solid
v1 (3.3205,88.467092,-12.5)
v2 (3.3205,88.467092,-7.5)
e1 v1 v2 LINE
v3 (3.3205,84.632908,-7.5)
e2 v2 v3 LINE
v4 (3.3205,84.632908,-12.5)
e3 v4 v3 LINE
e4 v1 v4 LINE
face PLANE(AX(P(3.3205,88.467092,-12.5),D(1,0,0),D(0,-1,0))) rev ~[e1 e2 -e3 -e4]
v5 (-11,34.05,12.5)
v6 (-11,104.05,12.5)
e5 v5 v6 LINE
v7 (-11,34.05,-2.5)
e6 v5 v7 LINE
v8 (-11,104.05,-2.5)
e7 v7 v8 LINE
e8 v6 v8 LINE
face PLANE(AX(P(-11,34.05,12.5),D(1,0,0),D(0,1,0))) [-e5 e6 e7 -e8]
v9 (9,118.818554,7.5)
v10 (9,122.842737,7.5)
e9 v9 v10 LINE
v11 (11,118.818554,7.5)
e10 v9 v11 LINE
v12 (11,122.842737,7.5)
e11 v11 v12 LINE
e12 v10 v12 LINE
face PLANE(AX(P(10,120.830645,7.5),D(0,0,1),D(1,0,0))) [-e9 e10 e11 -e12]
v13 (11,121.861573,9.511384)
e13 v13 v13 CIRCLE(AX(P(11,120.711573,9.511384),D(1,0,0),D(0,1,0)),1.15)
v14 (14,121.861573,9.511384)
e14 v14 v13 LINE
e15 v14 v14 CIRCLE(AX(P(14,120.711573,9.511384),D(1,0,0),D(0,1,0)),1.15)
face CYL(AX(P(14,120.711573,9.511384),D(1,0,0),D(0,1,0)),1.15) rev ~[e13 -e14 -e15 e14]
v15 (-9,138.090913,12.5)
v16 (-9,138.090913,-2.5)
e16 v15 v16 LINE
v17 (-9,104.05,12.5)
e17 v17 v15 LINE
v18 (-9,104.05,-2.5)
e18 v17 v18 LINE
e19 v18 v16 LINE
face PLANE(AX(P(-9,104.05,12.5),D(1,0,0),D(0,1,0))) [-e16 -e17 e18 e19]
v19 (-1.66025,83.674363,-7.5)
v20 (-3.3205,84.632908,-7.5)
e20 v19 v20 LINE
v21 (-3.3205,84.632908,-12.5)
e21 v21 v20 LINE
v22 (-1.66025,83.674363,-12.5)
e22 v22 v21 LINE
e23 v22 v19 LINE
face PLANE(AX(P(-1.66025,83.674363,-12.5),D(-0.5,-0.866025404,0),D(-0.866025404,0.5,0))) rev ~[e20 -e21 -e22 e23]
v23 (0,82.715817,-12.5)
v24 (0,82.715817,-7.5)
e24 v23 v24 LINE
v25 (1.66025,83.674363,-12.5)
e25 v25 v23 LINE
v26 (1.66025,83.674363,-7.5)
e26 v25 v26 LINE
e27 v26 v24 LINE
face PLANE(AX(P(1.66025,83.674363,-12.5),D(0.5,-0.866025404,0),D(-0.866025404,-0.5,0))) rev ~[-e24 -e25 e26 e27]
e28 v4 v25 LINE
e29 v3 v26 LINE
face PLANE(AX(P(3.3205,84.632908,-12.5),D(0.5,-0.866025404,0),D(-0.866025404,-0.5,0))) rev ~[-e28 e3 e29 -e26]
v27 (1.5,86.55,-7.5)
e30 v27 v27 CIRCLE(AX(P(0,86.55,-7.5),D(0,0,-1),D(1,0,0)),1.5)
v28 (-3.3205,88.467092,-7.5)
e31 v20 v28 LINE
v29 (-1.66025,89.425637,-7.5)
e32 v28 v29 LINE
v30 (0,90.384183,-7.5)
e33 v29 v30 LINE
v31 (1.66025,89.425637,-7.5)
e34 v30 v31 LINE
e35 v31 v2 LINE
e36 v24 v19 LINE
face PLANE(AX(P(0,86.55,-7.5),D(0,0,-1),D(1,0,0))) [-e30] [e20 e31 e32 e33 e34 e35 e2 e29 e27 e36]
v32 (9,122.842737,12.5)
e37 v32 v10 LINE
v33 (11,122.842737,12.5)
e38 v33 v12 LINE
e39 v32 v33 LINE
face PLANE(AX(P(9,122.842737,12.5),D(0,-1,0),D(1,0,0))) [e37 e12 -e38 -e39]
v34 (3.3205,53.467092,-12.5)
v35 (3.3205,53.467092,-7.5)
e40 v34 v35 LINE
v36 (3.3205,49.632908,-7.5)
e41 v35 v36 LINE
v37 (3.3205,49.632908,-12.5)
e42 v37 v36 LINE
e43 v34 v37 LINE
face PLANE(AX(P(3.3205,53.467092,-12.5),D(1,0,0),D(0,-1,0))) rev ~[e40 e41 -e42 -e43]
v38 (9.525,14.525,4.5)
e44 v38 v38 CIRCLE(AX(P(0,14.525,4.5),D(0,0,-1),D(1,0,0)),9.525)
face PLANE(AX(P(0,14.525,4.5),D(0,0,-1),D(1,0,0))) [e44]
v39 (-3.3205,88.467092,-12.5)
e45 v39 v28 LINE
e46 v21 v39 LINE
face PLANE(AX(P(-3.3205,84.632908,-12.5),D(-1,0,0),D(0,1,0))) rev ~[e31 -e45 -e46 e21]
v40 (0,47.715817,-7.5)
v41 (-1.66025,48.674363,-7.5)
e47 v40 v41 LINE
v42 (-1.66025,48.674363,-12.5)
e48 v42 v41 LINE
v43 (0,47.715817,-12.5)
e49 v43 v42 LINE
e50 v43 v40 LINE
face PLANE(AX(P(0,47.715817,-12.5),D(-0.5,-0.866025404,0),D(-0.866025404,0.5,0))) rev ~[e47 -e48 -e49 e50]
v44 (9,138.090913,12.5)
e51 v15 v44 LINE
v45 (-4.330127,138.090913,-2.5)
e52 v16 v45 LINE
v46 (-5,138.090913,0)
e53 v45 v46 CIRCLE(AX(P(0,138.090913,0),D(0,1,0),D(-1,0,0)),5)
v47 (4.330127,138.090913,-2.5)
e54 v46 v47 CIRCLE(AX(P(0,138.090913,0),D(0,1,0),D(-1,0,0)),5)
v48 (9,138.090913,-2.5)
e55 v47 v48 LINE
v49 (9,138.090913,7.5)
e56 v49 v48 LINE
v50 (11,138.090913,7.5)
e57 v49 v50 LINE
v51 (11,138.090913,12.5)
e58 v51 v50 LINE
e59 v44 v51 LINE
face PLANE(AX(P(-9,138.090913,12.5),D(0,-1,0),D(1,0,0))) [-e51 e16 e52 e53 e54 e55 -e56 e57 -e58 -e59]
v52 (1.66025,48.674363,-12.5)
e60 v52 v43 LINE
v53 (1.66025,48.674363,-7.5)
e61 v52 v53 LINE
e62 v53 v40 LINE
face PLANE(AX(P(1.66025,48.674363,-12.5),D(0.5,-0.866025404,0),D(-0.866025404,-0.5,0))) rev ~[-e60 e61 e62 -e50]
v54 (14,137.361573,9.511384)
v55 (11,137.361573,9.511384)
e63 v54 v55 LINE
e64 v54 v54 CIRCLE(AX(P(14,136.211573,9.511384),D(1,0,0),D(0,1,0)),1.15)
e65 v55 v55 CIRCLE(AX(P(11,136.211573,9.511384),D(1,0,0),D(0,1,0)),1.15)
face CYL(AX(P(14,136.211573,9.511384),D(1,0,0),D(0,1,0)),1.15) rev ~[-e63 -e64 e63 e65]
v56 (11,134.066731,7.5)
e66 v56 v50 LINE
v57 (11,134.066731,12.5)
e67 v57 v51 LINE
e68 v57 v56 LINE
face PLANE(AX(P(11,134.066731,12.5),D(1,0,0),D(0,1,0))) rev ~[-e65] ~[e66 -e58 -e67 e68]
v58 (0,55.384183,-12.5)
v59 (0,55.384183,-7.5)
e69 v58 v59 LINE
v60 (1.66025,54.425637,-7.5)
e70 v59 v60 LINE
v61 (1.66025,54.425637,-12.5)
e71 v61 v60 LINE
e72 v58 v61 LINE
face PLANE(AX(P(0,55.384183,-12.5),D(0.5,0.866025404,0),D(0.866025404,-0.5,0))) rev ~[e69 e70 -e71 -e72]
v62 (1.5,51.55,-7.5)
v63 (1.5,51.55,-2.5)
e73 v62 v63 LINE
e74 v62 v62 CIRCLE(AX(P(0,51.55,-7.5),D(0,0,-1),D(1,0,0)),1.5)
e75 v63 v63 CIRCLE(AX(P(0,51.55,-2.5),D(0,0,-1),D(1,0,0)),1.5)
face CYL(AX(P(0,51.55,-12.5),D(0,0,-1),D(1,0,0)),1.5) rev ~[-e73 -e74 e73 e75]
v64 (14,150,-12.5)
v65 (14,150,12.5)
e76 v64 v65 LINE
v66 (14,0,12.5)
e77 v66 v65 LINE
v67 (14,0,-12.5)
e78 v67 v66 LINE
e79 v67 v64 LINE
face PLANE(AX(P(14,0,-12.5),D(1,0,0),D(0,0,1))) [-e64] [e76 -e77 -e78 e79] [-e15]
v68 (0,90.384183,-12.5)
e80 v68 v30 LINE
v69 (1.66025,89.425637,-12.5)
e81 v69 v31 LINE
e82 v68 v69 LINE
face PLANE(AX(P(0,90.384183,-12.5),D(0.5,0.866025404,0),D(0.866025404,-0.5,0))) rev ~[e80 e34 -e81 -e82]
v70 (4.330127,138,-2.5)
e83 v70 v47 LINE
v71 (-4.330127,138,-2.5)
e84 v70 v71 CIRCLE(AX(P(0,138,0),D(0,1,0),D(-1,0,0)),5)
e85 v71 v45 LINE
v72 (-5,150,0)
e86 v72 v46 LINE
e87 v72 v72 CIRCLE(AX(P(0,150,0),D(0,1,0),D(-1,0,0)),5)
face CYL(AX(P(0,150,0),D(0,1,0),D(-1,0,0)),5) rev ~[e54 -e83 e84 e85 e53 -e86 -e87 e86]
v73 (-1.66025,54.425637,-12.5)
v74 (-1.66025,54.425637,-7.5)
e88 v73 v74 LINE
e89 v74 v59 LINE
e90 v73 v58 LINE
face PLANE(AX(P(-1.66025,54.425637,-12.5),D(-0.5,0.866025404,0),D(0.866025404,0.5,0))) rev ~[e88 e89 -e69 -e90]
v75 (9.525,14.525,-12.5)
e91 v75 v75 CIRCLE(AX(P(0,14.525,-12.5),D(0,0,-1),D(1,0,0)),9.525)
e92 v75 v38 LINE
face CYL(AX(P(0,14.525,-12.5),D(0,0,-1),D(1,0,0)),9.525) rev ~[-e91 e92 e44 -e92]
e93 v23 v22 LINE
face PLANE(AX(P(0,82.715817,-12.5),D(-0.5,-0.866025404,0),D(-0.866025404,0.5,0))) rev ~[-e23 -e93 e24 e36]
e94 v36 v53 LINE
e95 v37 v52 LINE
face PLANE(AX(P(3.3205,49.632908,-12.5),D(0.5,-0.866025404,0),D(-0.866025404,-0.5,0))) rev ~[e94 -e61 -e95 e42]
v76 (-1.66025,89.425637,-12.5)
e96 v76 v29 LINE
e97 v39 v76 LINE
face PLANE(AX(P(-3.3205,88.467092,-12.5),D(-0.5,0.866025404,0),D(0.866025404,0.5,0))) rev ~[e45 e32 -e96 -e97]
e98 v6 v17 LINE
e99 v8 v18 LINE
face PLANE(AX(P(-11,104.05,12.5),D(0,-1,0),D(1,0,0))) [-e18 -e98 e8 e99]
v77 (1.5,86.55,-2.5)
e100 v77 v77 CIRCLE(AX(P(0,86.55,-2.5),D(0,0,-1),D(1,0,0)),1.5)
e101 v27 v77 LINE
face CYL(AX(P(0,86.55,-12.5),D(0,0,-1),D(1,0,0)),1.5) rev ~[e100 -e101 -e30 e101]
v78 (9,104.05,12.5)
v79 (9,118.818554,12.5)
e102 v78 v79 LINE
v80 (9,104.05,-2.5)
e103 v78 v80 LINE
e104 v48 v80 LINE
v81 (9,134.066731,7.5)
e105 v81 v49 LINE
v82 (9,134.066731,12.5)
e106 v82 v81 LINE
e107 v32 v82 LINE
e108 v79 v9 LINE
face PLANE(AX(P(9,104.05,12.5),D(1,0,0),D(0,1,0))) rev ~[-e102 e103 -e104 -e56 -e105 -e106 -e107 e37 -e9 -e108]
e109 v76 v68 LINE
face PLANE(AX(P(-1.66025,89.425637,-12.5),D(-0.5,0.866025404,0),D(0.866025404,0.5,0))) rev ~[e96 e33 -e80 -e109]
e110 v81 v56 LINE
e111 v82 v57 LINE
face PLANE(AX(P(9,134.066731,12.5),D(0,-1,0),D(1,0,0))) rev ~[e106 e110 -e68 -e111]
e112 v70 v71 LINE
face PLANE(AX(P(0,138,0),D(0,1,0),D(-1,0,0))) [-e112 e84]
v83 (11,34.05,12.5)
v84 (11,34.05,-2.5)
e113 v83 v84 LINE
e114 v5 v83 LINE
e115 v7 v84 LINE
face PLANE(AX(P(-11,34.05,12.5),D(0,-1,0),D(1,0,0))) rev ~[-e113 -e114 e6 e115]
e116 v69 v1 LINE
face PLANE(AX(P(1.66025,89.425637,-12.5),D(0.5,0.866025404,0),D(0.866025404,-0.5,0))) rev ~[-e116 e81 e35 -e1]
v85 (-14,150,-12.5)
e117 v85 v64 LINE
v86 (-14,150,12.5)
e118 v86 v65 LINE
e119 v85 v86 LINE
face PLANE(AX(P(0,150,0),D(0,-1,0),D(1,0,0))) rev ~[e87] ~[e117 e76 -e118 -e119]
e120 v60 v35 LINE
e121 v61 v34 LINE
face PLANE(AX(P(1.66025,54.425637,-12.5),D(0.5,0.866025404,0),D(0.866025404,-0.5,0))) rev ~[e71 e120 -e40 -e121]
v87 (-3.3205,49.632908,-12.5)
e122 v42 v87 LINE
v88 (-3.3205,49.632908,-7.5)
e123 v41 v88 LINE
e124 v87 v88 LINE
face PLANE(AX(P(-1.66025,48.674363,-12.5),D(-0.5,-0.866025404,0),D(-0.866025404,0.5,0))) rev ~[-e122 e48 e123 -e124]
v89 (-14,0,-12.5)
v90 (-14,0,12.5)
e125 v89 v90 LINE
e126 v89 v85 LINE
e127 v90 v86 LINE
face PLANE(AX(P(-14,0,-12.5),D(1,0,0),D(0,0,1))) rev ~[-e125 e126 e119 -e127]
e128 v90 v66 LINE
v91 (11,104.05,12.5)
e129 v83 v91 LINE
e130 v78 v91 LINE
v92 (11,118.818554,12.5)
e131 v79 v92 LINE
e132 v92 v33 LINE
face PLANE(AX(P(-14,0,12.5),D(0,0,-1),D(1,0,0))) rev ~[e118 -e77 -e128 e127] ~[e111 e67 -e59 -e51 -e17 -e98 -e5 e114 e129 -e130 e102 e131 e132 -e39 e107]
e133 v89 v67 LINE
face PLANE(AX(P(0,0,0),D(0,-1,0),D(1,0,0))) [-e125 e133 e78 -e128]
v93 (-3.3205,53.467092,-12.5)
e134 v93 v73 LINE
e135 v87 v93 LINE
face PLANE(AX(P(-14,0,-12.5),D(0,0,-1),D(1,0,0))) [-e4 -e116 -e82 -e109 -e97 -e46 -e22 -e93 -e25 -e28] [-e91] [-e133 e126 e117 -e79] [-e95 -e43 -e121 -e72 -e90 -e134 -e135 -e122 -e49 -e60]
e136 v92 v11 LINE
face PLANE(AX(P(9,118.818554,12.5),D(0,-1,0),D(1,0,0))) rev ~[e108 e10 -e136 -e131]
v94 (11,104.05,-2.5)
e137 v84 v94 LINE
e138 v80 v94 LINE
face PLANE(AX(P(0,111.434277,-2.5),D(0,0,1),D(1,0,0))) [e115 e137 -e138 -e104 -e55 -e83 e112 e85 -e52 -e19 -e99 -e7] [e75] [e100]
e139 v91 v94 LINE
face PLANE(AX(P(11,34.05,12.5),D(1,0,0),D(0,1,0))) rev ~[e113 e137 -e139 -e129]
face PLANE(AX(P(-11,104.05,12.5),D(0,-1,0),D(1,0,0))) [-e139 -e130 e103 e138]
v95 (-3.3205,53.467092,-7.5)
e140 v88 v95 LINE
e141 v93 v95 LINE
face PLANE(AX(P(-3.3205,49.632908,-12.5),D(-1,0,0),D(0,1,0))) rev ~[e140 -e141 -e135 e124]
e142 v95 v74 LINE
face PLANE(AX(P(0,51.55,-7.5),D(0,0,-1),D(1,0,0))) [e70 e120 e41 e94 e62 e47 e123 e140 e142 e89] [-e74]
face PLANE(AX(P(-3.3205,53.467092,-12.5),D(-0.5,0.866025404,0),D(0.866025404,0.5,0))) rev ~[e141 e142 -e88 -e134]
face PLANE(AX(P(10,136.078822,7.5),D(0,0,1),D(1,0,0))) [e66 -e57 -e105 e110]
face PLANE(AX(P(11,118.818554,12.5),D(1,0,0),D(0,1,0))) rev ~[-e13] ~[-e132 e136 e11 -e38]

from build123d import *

# Parameters (mm, degrees)
F0_W      = 28
F0_H      = 25
F1_DEPTH  = 150
F2_R      = 9.525
F3_DEPTH  = 17
F4_R      = 1.5
F5_DEPTH  = 5
F6_R      = 1.5
F7_DEPTH  = 25.001
F8_W      = 22
F8_H      = 70
F9_DEPTH  = 15
F10_R     = 1.15
F11_DEPTH = 5
F12_W     = 2
F12_H     = 4.0241825168
F13_DEPTH = 5
F14_W     = 18
F14_H     = 19.2723592291
F15_DEPTH = 15
F16_W     = 18
F16_H     = 14.7685540254
F17_DEPTH = 15
F18_R     = 5
F19_DEPTH = 12


# Not quite as in the source:
# - the program builds the solid bodies; features that only make, move or delete a surface that nothing else refers to are left out


with BuildPart() as f1:
    # F0 (on Front) → F1 (new body)
    with BuildSketch(Plane.XZ):
        Rectangle(F0_W, F0_H)
    extrude(amount=-F1_DEPTH)

    # F2 (on face) → F3 (cut)
    with BuildSketch(Plane(origin=(0, 0, -12.5), x_dir=(1, 0, 0), z_dir=(0, 0, -1))):
        with Locations((0, -14.525)):
            Circle(F2_R)
    extrude(amount=-F3_DEPTH, mode=Mode.SUBTRACT)

    # F4 (on face) → F5 (cut)
    with BuildSketch(Plane(origin=(0, 0, -12.5), x_dir=(1, 0, 0), z_dir=(0, 0, -1))):
        with BuildLine():
            ThreePointArc((1.6602502077, -54.4256372334), (2.8756374132, -53.2102498962), (3.3205, -51.55))
            ThreePointArc((3.3205, -51.55), (2.8756373339, -49.8897499664), (1.6602499328, -48.6743626079))
            ThreePointArc((1.6602499328, -48.6743626079), (-1.397e-07, -48.2295), (-1.6602501748, -48.6743627476))
            ThreePointArc((-1.6602501748, -48.6743627476), (-2.8756374037, -49.8897500874), (-3.3205, -51.55))
            ThreePointArc((-3.3205, -51.55), (-2.8756373712, -53.210249969), (-1.660250062, -54.4256373175))
            ThreePointArc((-1.660250062, -54.4256373175), (8.41e-08, -54.8705), (1.6602502077, -54.4256372334))
        make_face()
        with Locations((0, -51.55)):
            Circle(F4_R, mode=Mode.SUBTRACT)
        with BuildLine():
            Line((3.3205, -53.4670915688), (3.3205, -51.55))
            ThreePointArc((3.3205, -51.55), (2.8756374132, -53.2102498962), (1.6602502077, -54.4256372334))
            Line((1.6602502077, -54.4256372334), (3.3205, -53.4670915688))
        make_face()
        with BuildLine():
            ThreePointArc((1.6602499328, -48.6743626079), (2.8756373339, -49.8897499664), (3.3205, -51.55))
            Line((3.3205, -51.55), (3.3205, -49.6329084312))
            Line((3.3205, -49.6329084312), (1.6602499328, -48.6743626079))
        make_face()
        with BuildLine():
            ThreePointArc((-1.6602501748, -48.6743627476), (-1.397e-07, -48.2295), (1.6602499328, -48.6743626079))
            Line((1.6602499328, -48.6743626079), (0, -47.7158168623))
            Line((0, -47.7158168623), (-1.6602501748, -48.6743627476))
        make_face()
        with BuildLine():
            Line((0, -55.3841831377), (1.6602502077, -54.4256372334))
            ThreePointArc((1.6602502077, -54.4256372334), (8.41e-08, -54.8705), (-1.660250062, -54.4256373175))
            Line((-1.660250062, -54.4256373175), (0, -55.3841831377))
        make_face()
        with BuildLine():
            ThreePointArc((-3.3205, -51.55), (-2.8756374037, -49.8897500874), (-1.6602501748, -48.6743627476))
            Line((-1.6602501748, -48.6743627476), (-3.3205, -49.6329084312))
            Line((-3.3205, -49.6329084312), (-3.3205, -51.55))
        make_face()
        with BuildLine():
            Line((-3.3205, -53.4670915688), (-1.660250062, -54.4256373175))
            ThreePointArc((-1.660250062, -54.4256373175), (-2.8756373712, -53.210249969), (-3.3205, -51.55))
            Line((-3.3205, -51.55), (-3.3205, -53.4670915688))
        make_face()
        with BuildLine():
            ThreePointArc((1.6602500198, -89.4256373418), (2.875637359, -88.2102499901), (3.3205, -86.55))
            ThreePointArc((3.3205, -86.55), (2.8756374351, -84.8897501418), (1.6602502837, -83.6743628105))
            ThreePointArc((1.6602502837, -83.6743628105), (-2.2e-09, -83.2295), (-1.6602502875, -83.6743628127))
            ThreePointArc((-1.6602502875, -83.6743628127), (-2.8756374363, -84.8897501438), (-3.3205, -86.55))
            ThreePointArc((-3.3205, -86.55), (-2.875637359, -88.2102499901), (-1.6602500198, -89.4256373418))
            ThreePointArc((-1.6602500198, -89.4256373418), (0, -89.8705), (1.6602500198, -89.4256373418))
        make_face()
        with Locations((0, -86.55)):
            Circle(F4_R, mode=Mode.SUBTRACT)
        with BuildLine():
            Line((3.3205, -88.4670915688), (3.3205, -86.55))
            ThreePointArc((3.3205, -86.55), (2.875637359, -88.2102499901), (1.6602500198, -89.4256373418))
            Line((1.6602500198, -89.4256373418), (3.3205, -88.4670915688))
        make_face()
        with BuildLine():
            ThreePointArc((1.6602502837, -83.6743628105), (2.8756374351, -84.8897501418), (3.3205, -86.55))
            Line((3.3205, -86.55), (3.3205, -84.6329084312))
            Line((3.3205, -84.6329084312), (1.6602502837, -83.6743628105))
        make_face()
        with BuildLine():
            ThreePointArc((-1.6602502875, -83.6743628127), (-2.2e-09, -83.2295), (1.6602502837, -83.6743628105))
            Line((1.6602502837, -83.6743628105), (0, -82.7158168623))
            Line((0, -82.7158168623), (-1.6602502875, -83.6743628127))
        make_face()
        with BuildLine():
            Line((0, -90.3841831377), (1.6602500198, -89.4256373418))
            ThreePointArc((1.6602500198, -89.4256373418), (0, -89.8705), (-1.6602500198, -89.4256373418))
            Line((-1.6602500198, -89.4256373418), (0, -90.3841831377))
        make_face()
        with BuildLine():
            ThreePointArc((-3.3205, -86.55), (-2.8756374363, -84.8897501438), (-1.6602502875, -83.6743628127))
            Line((-1.6602502875, -83.6743628127), (-3.3205, -84.6329084312))
            Line((-3.3205, -84.6329084312), (-3.3205, -86.55))
        make_face()
        with BuildLine():
            Line((-3.3205, -88.4670915688), (-1.6602500198, -89.4256373418))
            ThreePointArc((-1.6602500198, -89.4256373418), (-2.875637359, -88.2102499901), (-3.3205, -86.55))
            Line((-3.3205, -86.55), (-3.3205, -88.4670915688))
        make_face()
    extrude(amount=-F5_DEPTH, mode=Mode.SUBTRACT)

    # F6 (on face) → F7 (cut, through all)
    with BuildSketch(Plane(origin=(0, 0, -12.5), x_dir=(1, 0, 0), z_dir=(0, 0, -1))):
        with Locations((0, -51.55)):
            Circle(F6_R)
        with Locations((0, -86.55)):
            Circle(F6_R)
    extrude(amount=-F7_DEPTH, mode=Mode.SUBTRACT)

    # F8 (on face) → F9 (cut)
    with BuildSketch(Plane.XY.offset(12.5)):
        with Locations((0, 69.05)):
            Rectangle(F8_W, F8_H)
    extrude(amount=-F9_DEPTH, mode=Mode.SUBTRACT)

    # F10 (on face) → F11 (cut)
    with BuildSketch(Plane.YZ.offset(14)):
        with Locations((136.2115726471, 9.5113839224)):
            Circle(F10_R)
        with Locations((120.7115726471, 9.5113839224)):
            Circle(F10_R)
    extrude(amount=-F11_DEPTH, mode=Mode.SUBTRACT)

    # F12 (on face) → F13 (cut)
    with BuildSketch(Plane.XY.offset(12.5)):
        with Locations((10, 120.8306452838)):
            Rectangle(F12_W, F12_H)
        with Locations((10, 136.0788219961)):
            Rectangle(F12_W, F12_H)
    extrude(amount=-F13_DEPTH, mode=Mode.SUBTRACT)

    # F14 (on face) → F15 (cut)
    with BuildSketch(Plane.XY.offset(12.5)):
        with Locations((0, 128.45473364)):
            Rectangle(F14_W, F14_H)
    extrude(amount=-F15_DEPTH, mode=Mode.SUBTRACT)

    # F16 (on face) → F17 (cut)
    with BuildSketch(Plane.XY.offset(12.5)):
        with Locations((0, 111.4342770127)):
            Rectangle(F16_W, F16_H)
    extrude(amount=-F17_DEPTH, mode=Mode.SUBTRACT)

    # F18 (on face) → F19 (cut)
    with BuildSketch(Plane(origin=(0, 150, 0), x_dir=(-1, 0, 0), z_dir=(0, 1, 0))):
        Circle(F18_R)
    extrude(amount=-F19_DEPTH, mode=Mode.SUBTRACT)


solid = f1.part
